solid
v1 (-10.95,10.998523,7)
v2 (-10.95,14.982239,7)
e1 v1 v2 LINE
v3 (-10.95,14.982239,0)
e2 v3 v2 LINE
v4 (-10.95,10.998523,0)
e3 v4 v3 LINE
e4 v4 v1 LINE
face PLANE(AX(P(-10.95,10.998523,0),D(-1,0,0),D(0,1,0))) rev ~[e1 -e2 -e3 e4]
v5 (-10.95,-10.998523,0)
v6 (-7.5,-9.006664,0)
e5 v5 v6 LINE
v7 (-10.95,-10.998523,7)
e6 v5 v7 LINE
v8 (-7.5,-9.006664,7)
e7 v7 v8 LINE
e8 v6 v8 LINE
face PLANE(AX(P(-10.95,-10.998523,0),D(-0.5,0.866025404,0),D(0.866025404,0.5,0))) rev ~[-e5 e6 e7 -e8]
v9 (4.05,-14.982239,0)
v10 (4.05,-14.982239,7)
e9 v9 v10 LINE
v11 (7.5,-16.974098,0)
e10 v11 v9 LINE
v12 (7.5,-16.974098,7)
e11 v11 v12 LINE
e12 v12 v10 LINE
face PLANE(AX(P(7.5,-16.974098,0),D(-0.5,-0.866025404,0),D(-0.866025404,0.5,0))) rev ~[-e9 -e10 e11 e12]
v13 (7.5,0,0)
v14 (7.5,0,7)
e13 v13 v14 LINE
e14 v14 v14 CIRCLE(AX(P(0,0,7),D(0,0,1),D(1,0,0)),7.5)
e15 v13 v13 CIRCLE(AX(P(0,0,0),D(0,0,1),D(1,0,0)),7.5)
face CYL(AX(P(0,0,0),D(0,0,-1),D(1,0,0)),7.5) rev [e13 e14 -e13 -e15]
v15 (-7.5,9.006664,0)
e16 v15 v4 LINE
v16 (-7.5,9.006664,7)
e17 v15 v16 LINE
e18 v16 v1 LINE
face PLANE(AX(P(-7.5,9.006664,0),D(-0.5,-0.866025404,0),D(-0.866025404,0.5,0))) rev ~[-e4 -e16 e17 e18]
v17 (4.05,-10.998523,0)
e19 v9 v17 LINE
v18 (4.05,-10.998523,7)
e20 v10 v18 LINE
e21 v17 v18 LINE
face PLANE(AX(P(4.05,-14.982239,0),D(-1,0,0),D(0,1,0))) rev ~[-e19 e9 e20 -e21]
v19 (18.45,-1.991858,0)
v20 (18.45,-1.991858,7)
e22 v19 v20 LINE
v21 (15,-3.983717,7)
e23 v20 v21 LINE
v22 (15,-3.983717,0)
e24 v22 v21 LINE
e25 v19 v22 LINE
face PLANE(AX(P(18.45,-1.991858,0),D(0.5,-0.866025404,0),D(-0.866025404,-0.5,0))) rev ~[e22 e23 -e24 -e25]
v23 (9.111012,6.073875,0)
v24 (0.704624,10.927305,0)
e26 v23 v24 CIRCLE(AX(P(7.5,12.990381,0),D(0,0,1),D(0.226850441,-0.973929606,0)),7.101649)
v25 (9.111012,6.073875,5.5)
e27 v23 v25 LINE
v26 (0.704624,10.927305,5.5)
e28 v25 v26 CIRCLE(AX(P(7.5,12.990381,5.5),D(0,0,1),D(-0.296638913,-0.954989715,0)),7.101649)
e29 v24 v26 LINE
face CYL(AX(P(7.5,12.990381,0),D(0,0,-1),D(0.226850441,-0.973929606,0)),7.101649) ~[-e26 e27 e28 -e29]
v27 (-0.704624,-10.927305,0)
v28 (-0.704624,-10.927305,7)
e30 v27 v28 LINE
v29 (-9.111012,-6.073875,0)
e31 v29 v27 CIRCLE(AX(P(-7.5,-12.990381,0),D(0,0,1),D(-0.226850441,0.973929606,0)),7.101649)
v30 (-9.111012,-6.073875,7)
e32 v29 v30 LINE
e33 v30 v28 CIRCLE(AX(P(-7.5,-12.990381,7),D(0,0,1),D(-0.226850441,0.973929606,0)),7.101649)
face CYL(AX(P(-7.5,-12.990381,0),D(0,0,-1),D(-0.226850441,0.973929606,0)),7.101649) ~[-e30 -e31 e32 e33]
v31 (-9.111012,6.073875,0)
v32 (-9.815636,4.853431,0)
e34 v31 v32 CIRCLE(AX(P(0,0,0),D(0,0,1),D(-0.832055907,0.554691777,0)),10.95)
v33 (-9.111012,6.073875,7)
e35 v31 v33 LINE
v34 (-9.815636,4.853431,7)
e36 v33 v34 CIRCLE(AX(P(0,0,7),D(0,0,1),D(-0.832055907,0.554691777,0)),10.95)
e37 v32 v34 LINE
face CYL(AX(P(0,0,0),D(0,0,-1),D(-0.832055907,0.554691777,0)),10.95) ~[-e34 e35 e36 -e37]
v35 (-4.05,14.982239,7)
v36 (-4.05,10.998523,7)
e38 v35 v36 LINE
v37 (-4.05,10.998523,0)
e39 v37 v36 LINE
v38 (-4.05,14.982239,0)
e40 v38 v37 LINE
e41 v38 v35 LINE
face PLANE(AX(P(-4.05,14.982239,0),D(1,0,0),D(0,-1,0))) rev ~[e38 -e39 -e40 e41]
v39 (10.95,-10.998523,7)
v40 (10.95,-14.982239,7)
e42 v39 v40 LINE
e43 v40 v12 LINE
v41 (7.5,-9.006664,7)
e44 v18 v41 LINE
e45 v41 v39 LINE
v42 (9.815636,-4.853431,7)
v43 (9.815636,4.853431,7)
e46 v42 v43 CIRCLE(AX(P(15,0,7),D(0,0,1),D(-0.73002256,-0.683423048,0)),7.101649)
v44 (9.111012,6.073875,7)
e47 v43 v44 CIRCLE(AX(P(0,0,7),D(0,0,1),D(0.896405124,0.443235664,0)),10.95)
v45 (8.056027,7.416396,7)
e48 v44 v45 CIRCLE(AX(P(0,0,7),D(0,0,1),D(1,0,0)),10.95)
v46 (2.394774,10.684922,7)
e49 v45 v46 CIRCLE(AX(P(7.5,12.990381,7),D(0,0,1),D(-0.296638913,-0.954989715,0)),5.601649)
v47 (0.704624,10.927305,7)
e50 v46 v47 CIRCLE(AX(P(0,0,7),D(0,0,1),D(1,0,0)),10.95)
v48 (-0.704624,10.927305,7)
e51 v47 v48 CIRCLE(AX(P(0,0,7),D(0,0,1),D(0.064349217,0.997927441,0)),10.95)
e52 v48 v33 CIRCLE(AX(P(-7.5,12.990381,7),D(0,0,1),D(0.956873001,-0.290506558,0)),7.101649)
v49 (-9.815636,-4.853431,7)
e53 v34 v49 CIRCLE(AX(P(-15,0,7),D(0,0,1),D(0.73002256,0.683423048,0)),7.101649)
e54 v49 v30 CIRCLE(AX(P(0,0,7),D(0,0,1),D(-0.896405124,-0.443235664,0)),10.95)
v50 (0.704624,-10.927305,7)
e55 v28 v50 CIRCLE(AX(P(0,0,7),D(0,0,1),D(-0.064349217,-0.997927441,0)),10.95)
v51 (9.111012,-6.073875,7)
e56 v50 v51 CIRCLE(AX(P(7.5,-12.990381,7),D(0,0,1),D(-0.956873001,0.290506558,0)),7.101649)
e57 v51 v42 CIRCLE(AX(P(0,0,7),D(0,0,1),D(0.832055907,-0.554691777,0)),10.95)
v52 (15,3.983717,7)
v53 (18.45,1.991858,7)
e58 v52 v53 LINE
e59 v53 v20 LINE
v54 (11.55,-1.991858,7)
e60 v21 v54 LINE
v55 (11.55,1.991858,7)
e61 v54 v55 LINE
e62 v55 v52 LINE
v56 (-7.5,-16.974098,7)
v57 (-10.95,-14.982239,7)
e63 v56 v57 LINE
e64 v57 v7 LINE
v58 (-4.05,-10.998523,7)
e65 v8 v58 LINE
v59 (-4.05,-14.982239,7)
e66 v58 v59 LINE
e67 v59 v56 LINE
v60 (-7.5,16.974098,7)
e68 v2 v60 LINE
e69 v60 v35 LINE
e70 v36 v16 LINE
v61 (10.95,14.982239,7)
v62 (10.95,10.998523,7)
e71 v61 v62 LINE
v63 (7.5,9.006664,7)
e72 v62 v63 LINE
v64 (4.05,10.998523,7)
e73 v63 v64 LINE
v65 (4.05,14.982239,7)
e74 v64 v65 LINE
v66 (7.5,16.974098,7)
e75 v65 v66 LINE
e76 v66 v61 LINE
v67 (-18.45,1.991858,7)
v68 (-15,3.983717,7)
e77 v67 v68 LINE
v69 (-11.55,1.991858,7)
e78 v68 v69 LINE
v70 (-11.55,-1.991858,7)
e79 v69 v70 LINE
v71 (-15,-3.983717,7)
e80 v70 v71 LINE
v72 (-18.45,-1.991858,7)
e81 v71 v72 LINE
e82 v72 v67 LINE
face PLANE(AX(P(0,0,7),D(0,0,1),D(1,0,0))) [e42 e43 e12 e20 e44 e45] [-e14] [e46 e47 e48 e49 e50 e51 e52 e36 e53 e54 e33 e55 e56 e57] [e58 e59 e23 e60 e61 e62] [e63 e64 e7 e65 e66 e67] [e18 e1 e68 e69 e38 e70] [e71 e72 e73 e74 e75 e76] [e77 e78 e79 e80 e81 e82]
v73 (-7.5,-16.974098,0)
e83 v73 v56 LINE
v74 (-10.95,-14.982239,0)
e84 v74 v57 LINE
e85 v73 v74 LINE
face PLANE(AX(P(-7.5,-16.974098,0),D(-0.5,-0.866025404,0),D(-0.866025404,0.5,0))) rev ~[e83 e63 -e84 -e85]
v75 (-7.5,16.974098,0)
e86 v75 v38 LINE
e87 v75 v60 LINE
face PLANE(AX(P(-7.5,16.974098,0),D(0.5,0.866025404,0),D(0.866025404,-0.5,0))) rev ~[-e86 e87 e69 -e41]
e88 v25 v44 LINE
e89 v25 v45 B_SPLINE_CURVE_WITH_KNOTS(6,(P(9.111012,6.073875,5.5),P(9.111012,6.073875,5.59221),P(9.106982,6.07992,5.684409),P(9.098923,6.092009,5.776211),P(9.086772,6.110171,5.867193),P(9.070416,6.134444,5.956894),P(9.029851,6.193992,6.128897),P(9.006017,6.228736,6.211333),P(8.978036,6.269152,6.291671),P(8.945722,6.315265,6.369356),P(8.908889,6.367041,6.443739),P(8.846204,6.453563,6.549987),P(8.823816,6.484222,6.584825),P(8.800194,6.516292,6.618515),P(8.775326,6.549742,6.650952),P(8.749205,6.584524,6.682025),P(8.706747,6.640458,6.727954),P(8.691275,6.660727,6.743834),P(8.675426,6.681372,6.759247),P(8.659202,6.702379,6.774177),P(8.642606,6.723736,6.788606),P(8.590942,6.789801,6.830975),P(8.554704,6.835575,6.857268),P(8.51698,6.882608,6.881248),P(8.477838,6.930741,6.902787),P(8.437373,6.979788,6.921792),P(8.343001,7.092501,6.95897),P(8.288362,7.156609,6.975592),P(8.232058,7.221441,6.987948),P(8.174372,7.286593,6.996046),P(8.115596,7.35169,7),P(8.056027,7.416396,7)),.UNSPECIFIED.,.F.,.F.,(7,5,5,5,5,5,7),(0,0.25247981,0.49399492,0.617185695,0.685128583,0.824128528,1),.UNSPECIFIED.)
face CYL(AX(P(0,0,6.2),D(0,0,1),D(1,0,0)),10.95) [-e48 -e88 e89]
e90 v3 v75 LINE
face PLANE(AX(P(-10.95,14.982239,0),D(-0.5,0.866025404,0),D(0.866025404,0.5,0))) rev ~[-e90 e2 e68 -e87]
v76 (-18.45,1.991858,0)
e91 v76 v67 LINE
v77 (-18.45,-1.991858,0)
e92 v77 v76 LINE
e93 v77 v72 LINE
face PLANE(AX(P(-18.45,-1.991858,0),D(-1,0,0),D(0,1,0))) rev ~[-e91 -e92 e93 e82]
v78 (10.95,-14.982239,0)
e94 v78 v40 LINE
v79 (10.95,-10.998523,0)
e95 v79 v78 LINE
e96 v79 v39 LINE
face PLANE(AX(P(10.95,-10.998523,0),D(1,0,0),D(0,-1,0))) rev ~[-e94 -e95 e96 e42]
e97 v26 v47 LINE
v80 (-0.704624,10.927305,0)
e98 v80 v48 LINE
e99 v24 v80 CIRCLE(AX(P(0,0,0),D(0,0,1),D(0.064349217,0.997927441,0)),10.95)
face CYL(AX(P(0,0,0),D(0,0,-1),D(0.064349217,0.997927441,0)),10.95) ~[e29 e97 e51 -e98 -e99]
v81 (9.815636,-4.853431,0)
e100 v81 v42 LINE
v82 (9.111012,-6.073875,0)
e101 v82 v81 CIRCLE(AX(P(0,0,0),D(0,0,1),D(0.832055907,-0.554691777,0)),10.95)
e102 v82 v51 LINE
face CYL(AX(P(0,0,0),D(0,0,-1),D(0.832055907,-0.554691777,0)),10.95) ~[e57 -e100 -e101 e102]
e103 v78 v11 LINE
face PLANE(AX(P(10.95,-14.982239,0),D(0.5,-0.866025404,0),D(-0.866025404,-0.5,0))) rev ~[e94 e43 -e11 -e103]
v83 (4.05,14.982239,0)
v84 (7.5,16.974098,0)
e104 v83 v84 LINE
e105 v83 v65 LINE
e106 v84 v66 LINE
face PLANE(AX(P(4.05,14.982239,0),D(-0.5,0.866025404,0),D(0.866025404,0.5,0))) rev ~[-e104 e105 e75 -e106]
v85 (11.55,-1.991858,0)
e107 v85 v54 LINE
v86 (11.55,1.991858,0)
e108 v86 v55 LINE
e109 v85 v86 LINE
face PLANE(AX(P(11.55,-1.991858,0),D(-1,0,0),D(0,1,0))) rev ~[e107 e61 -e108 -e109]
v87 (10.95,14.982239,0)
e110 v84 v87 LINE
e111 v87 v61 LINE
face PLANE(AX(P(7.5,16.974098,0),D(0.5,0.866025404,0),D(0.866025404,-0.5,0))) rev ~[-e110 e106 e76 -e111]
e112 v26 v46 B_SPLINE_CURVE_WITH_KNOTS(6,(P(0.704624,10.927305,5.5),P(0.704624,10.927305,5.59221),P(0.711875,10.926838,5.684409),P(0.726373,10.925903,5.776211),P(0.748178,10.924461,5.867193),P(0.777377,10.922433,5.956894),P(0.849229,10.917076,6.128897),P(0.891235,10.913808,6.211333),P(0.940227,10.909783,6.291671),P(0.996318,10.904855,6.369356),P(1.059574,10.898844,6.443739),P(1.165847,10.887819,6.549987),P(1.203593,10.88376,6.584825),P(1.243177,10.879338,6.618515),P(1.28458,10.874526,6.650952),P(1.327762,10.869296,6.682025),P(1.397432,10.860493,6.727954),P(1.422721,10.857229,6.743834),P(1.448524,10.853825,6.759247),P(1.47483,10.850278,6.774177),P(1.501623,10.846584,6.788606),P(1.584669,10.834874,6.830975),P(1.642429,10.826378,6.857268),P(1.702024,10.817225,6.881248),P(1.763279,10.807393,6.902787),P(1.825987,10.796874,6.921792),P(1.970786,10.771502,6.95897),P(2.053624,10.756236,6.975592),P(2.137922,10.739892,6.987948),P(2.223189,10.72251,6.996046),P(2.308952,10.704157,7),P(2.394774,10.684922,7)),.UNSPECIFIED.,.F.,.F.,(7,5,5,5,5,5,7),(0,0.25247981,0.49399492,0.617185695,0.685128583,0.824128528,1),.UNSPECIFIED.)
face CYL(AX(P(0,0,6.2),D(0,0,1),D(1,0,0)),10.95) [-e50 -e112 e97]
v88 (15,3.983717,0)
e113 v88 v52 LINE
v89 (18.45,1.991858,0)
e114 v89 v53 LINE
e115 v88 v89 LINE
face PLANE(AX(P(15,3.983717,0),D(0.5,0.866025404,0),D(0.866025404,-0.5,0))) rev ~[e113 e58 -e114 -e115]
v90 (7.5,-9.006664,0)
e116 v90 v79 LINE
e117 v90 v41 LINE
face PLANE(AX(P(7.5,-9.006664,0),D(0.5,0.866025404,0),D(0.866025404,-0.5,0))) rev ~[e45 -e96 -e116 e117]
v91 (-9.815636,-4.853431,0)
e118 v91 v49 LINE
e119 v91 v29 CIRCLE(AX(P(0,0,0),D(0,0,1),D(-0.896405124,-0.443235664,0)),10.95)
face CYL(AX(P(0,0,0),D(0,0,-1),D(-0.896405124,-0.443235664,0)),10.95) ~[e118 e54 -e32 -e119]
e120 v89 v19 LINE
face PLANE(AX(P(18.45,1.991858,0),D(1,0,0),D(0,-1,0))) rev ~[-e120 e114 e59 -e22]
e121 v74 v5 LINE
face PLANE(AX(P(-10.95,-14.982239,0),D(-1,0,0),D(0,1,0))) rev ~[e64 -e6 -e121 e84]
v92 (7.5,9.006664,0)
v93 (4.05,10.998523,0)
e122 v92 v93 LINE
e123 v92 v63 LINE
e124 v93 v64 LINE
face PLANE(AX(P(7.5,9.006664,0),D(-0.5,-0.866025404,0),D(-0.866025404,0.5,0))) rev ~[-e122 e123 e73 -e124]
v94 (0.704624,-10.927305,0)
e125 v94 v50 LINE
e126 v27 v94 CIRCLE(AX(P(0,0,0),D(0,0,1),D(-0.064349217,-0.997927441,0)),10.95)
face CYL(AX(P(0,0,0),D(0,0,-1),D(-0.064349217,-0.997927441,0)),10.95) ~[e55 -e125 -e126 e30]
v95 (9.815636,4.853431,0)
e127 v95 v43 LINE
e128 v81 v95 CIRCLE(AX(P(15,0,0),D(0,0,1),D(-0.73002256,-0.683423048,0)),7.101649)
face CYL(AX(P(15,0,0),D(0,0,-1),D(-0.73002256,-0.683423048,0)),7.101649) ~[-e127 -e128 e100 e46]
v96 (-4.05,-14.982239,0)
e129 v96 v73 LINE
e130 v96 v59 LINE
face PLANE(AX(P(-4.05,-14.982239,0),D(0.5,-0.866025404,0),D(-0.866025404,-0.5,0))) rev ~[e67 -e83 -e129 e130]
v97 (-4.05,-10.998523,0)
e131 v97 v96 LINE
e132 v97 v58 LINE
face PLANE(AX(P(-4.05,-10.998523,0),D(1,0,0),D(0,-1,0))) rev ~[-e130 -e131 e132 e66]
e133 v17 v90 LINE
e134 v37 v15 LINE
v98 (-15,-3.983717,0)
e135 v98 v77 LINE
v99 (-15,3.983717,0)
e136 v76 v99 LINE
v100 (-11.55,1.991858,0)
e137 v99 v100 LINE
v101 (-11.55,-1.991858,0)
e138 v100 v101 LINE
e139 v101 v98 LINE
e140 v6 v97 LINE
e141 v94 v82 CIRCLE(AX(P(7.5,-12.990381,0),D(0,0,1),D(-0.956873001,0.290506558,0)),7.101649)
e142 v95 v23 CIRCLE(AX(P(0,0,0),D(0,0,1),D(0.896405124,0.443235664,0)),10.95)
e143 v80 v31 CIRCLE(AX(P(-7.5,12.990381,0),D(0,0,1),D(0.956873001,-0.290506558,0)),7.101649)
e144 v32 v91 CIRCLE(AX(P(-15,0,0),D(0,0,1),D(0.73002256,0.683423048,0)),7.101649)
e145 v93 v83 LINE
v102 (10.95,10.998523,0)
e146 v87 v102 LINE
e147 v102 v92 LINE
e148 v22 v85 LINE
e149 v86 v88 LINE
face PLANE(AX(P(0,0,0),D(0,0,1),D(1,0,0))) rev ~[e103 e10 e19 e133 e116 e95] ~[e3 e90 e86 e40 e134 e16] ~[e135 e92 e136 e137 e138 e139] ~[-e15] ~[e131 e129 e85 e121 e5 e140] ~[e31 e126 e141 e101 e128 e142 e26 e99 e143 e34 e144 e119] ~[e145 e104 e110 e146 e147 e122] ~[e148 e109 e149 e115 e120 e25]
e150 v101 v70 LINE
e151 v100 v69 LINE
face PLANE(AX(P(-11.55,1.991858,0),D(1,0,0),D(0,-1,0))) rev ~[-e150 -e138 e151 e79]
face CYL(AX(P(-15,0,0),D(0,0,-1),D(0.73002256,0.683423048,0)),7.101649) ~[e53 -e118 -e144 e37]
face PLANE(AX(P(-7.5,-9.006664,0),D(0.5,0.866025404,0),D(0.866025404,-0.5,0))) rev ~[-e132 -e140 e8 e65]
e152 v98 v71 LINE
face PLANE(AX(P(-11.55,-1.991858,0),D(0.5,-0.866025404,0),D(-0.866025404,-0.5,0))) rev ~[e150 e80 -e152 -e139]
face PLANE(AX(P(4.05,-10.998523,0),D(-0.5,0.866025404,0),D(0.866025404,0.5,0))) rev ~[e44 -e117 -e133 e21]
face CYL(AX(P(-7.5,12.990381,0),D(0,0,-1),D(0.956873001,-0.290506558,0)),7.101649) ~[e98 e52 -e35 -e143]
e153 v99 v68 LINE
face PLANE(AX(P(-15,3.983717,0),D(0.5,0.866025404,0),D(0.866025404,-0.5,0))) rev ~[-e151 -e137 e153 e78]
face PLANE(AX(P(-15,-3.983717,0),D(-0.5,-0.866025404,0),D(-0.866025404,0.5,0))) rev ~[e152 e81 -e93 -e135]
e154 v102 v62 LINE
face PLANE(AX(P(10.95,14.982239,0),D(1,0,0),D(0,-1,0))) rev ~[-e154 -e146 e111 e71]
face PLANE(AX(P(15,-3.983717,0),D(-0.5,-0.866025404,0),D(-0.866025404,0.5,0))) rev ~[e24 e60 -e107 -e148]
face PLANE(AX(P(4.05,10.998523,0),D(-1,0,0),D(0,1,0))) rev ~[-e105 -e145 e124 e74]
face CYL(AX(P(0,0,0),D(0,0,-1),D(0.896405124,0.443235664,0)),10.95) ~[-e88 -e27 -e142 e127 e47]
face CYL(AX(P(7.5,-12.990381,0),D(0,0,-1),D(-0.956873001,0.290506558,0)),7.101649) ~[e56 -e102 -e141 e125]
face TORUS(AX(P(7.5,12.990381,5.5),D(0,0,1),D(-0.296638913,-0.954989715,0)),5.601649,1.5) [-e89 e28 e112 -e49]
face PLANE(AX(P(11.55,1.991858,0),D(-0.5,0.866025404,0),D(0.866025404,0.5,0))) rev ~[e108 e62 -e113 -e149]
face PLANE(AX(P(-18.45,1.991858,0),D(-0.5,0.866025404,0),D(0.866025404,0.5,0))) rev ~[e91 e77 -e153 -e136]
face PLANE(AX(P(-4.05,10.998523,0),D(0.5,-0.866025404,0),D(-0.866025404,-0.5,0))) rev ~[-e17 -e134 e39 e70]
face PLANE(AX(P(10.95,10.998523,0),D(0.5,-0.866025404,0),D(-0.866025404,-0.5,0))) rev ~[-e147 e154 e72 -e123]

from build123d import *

# Parameters (mm, degrees)
F0_R        = 7.5
F1_DEPTH    = 7
F2_T4_ANGLE = 334.5116796515
F2_S5_R     = 10.95
F2_T6_DEPTH = 12


# Not quite as in the source:
# - a fillet or chamfer that OpenCascade refuses, or shapes differently, is made with other operations: its cross-section is extruded or revolved along the edge and cut away or added


with BuildPart() as f1:
    # F0 (on Top) → F1 (new body)
    with BuildSketch(Plane.XY):
        with BuildLine():
            ThreePointArc((-9.8156361058, 4.8534305226), (-22.1016488807, 0), (-9.8156361058, -4.8534305226))
            ThreePointArc((-9.8156361058, -4.8534305226), (-9.4829781714, -5.475), (-9.111012181, -6.0738749607))
            ThreePointArc((-9.111012181, -6.0738749607), (-11.0508244404, -19.1405893962), (-0.7046239248, -10.9273054833))
            ThreePointArc((-0.7046239248, -10.9273054833), (0, -10.95), (0.7046239248, -10.9273054833))
            ThreePointArc((0.7046239248, -10.9273054833), (11.0508244404, -19.1405893962), (9.111012181, -6.0738749607))
            ThreePointArc((9.111012181, -6.0738749607), (9.4829781714, -5.475), (9.8156361058, -4.8534305226))
            ThreePointArc((9.8156361058, -4.8534305226), (22.1016488807, 0), (9.8156361058, 4.8534305226))
            ThreePointArc((9.8156361058, 4.8534305226), (9.4829781714, 5.475), (9.111012181, 6.0738749607))
            ThreePointArc((9.111012181, 6.0738749607), (11.0508244404, 19.1405893962), (0.7046239248, 10.9273054833))
            ThreePointArc((0.7046239248, 10.9273054833), (0, 10.95), (-0.7046239248, 10.9273054833))
            ThreePointArc((-0.7046239248, 10.9273054833), (-11.0508244404, 19.1405893962), (-9.111012181, 6.0738749607))
            ThreePointArc((-9.111012181, 6.0738749607), (-9.4829781714, 5.475), (-9.8156361058, 4.8534305226))
        make_face()
        Polygon((-4.05, -14.9822394855), (-7.5, -16.9740979142), (-10.95, -14.9822394855), (-10.95, -10.9985226281), (-7.5, -9.0066641994), (-4.05, -10.9985226281), align=None, mode=Mode.SUBTRACT)
        Polygon((10.95, -10.9985226281), (10.95, -14.9822394855), (7.5, -16.9740979142), (4.05, -14.9822394855), (4.05, -10.9985226281), (7.5, -9.0066641994), align=None, mode=Mode.SUBTRACT)
        Polygon((-15, 3.9837168574), (-11.55, 1.9918584287), (-11.55, -1.9918584287), (-15, -3.9837168574), (-18.45, -1.9918584287), (-18.45, 1.9918584287), align=None, mode=Mode.SUBTRACT)
        Polygon((-10.95, 10.9985226281), (-10.95, 14.9822394855), (-7.5, 16.9740979142), (-4.05, 14.9822394855), (-4.05, 10.9985226281), (-7.5, 9.0066641994), align=None, mode=Mode.SUBTRACT)
        Circle(F0_R, mode=Mode.SUBTRACT)
        Polygon((15, 3.9837168574), (18.45, 1.9918584287), (18.45, -1.9918584287), (15, -3.9837168574), (11.55, -1.9918584287), (11.55, 1.9918584287), align=None, mode=Mode.SUBTRACT)
        Polygon((4.05, 14.9822394855), (7.5, 16.9740979142), (10.95, 14.9822394855), (10.95, 10.9985226281), (7.5, 9.0066641994), (4.05, 10.9985226281), align=None, mode=Mode.SUBTRACT)
    extrude(amount=F1_DEPTH)

    # F2: fillet of radius 1.5 on 1 edges, made by hand


with BuildPart() as f2_tool2:
    # F2_s3 → F2_t4 (revolve)
    with BuildSketch(Plane(origin=(3.1600326445, -0.9815693661, 0), x_dir=(0, 0, 1), z_dir=(-0.9549897147, 0.2966389131, 0))):
        with BuildLine():
            ThreePointArc((5.5, 7.528823267), (6.5606601718, 7.9681630952), (7, 9.028823267))
            Line((7, 9.028823267), (7, 7.528823267))
            Line((7, 7.528823267), (5.5, 7.528823267))
        make_face()
    revolve(axis=Axis((7.5, 12.9903810568, 7), (0, 0, 1)), revolution_arc=F2_T4_ANGLE)

    # F2_s5 → F2_t6 (cut, symmetric)
    with BuildSketch(Plane.XY.offset(6.2)):
        Circle(F2_S5_R)
    extrude(amount=F2_T6_DEPTH, both=True, mode=Mode.SUBTRACT)


with BuildPart() as f1_1:
    add(f1.part)

    # F2_t1: cut F2_tool2
    add(f2_tool2.part, mode=Mode.SUBTRACT)


solid = f1_1.part
